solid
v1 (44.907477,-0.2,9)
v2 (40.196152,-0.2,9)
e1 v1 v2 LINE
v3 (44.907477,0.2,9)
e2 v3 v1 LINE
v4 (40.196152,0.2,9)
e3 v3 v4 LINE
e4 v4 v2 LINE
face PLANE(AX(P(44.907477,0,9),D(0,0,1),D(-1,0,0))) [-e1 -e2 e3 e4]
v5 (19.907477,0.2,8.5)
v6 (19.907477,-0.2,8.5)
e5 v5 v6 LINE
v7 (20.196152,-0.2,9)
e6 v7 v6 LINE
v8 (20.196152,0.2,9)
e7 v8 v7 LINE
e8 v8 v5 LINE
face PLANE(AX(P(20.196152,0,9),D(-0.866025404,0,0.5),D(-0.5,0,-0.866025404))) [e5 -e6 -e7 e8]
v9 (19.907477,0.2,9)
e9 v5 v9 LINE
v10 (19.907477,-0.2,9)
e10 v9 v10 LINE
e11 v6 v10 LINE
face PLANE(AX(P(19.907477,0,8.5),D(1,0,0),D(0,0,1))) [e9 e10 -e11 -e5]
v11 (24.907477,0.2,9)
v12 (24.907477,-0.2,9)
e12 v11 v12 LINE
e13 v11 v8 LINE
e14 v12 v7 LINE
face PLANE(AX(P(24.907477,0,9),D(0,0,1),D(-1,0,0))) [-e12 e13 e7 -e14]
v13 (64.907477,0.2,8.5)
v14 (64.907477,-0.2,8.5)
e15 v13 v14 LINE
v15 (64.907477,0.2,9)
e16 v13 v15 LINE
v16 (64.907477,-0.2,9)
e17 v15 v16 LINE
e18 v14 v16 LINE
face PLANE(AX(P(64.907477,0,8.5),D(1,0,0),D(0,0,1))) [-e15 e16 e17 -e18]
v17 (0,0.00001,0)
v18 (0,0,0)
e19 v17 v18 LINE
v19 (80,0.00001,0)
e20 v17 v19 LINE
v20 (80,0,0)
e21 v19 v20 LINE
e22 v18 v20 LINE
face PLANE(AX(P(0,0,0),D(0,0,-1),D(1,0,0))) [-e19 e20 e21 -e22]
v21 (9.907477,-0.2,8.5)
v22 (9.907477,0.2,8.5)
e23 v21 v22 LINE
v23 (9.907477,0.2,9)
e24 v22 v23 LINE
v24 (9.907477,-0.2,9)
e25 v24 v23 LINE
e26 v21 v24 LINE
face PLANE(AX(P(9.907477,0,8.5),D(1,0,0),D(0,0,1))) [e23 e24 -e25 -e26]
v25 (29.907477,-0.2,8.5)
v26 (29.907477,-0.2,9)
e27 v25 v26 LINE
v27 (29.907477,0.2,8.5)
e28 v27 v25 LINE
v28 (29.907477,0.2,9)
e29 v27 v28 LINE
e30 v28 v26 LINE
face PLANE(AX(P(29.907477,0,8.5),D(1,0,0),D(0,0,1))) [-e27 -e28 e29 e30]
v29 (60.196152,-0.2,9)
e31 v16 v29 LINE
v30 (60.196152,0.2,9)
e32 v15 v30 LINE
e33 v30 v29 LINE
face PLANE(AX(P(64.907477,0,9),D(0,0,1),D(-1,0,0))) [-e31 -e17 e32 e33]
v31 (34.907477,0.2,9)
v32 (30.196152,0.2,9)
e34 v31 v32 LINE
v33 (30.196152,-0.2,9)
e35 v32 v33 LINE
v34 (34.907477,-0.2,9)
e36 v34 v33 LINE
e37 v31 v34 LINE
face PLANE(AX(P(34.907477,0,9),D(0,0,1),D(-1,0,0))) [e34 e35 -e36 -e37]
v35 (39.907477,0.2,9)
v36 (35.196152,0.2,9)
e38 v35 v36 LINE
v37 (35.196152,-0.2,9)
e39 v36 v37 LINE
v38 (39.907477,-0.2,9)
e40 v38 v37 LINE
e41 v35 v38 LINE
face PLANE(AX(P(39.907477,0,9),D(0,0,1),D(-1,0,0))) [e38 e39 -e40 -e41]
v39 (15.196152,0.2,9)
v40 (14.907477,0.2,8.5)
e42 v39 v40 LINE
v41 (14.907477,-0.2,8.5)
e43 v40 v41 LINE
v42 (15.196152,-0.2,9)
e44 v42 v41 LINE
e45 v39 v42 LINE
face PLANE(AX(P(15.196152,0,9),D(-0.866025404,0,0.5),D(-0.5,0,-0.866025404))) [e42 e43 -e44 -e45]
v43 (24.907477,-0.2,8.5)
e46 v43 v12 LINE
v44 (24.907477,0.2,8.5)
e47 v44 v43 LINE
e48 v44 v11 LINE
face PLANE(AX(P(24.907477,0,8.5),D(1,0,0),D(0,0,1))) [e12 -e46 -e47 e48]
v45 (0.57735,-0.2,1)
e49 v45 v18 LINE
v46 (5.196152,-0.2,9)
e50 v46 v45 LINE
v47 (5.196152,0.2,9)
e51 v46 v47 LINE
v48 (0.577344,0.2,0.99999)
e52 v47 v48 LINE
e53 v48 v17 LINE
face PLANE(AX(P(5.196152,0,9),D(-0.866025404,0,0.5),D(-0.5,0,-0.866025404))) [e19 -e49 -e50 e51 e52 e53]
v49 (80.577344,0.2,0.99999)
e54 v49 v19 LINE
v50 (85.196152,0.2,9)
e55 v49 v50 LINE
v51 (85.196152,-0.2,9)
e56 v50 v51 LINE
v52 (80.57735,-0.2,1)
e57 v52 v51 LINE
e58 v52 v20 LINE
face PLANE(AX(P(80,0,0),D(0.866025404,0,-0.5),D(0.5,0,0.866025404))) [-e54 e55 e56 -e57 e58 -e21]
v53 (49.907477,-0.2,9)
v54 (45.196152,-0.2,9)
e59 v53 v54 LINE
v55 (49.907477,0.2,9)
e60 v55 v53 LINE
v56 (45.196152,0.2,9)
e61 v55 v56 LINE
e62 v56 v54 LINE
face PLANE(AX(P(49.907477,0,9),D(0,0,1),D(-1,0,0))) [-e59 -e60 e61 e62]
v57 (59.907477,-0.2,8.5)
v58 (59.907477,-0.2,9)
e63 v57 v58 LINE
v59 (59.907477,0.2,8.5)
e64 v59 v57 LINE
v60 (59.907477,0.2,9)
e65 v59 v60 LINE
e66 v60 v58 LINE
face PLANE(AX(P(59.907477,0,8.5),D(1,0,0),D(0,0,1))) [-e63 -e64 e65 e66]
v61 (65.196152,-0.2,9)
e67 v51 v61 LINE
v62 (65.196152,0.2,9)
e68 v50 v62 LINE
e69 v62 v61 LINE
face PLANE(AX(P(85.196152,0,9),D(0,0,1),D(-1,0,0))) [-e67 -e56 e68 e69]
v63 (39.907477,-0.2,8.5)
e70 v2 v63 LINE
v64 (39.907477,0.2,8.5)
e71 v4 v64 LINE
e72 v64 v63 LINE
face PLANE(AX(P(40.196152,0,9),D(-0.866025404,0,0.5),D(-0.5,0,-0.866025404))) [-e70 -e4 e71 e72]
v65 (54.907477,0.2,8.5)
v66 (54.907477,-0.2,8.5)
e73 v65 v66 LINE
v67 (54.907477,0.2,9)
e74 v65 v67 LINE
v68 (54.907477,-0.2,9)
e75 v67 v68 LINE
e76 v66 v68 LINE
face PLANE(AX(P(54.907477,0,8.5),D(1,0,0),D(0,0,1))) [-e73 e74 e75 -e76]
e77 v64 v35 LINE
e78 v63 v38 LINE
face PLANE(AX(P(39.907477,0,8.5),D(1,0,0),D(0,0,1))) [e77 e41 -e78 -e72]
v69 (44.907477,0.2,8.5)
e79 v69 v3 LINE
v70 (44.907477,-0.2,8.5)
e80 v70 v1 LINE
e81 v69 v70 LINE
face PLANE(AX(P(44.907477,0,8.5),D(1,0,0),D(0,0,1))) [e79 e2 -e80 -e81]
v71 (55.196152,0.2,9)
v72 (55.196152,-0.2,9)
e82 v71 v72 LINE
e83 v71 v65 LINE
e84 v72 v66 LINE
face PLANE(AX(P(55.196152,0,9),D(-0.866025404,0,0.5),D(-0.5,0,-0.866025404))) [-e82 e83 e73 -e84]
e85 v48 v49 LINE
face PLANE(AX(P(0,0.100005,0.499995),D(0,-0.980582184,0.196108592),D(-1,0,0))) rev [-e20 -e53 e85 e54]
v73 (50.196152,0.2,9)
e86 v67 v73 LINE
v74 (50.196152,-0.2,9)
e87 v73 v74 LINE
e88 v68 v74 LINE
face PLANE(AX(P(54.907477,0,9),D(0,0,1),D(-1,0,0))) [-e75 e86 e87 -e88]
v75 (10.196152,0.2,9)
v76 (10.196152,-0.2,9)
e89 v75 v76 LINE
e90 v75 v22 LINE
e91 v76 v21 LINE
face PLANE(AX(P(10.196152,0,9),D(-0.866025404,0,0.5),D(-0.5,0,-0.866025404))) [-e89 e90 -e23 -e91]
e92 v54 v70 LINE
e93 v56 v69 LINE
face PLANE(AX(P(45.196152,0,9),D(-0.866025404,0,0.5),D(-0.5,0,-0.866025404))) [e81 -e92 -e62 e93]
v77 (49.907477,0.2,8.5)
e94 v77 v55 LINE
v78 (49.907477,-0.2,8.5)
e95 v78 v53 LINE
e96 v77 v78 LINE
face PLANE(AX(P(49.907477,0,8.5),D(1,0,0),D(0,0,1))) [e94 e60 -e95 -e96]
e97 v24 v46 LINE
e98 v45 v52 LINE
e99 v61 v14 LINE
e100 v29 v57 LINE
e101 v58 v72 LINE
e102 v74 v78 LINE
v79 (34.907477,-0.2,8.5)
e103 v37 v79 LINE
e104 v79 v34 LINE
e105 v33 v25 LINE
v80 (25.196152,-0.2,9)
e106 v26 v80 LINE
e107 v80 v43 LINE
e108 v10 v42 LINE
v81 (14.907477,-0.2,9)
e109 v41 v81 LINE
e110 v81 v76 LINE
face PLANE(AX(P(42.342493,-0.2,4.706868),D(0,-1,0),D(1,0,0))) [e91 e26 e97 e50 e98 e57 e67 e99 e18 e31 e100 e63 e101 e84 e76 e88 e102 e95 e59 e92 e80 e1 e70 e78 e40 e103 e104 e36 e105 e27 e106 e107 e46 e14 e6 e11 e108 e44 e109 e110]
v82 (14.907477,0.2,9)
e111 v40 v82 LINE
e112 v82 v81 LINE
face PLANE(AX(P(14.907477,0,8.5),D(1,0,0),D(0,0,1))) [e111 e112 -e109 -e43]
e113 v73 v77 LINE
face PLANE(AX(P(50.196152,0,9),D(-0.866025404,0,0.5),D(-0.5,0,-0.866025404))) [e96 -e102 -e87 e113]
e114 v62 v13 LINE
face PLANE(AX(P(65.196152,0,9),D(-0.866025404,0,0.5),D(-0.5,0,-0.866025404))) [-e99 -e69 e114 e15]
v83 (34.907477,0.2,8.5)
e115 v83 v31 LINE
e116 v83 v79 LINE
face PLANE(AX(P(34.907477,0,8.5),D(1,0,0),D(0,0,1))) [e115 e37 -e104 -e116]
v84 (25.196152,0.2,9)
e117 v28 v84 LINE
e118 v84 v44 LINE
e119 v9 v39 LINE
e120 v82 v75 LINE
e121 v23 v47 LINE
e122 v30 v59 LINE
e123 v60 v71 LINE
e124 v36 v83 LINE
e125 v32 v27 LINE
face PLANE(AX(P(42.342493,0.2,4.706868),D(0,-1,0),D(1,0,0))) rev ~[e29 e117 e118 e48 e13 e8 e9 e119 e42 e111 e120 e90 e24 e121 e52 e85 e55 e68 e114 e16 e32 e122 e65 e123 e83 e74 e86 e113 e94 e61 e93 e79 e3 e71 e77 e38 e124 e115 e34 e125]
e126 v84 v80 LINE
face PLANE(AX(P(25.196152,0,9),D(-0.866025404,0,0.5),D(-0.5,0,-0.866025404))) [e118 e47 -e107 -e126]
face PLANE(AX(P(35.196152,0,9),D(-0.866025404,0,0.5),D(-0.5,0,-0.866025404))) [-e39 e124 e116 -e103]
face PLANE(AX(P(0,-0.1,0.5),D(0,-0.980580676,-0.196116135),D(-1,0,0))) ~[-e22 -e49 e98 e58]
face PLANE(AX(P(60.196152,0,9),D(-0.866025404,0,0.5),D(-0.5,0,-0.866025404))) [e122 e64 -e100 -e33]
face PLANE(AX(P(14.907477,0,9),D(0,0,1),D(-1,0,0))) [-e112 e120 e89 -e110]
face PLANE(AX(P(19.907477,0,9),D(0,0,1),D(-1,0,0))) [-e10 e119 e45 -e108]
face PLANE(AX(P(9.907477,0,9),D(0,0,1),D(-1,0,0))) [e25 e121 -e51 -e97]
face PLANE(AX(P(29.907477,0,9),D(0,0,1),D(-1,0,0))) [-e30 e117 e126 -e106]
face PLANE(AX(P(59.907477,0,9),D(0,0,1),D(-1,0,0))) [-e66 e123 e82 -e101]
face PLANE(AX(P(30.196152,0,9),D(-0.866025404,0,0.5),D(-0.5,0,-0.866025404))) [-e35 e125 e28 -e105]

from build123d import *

# Parameters (mm, degrees)
F1_DEPTH   = 0.2
F2_SIZE2   = 0.2
F2_SIZE    = 1
F2_2_SIZE2 = 0.19999
F2_2_SIZE  = 0.99999


# Not quite as in the source:
# - a fillet or chamfer is up to 0.001 mm smaller than in the source, because OpenCascade refuses the exact size


with BuildPart() as f1:
    # F0 (on Front) → F1 (new body, symmetric)
    with BuildSketch(Plane.XZ):
        Polygon((5.1961524227, 9), (0, 0), (80, 0), (85.1961524227, 9), (65.1961524227, 9), (64.9074772881, 8.5), (64.9074772881, 9), (60.1961524227, 9), (59.9074772881, 8.5), (59.9074772881, 9), (55.1961524227, 9), (54.9074772881, 8.5), (54.9074772881, 9), (50.1961524227, 9), (49.9074772881, 8.5), (49.9074772881, 9), (45.1961524227, 9), (44.9074772881, 8.5), (44.9074772881, 9), (40.1961524227, 9), (39.9074772881, 8.5), (39.9074772881, 9), (35.1961524227, 9), (34.9074772881, 8.5), (34.9074772881, 9), (30.1961524227, 9), (29.9074772881, 8.5), (29.9074772881, 9), (25.1961524227, 9), (24.9074772881, 8.5), (24.9074772881, 9), (20.1961524227, 9), (19.9074772881, 8.5), (19.9074772881, 9), (15.1961524227, 9), (14.9074772881, 8.5), (14.9074772881, 9), (10.1961524227, 9), (9.9074772881, 8.5), (9.9074772881, 9), align=None)
    extrude(amount=F1_DEPTH, both=True)

    # F2
    f2_edges = [f1.edges().sort_by_distance(p)[0] for p in [
        (40, -0.2, 0),
    ]]
    f2_side = f1.faces().sort_by_distance((42.604211, -0.2, 4.494782))[0]
    chamfer(f2_edges, length=F2_SIZE, length2=F2_SIZE2, reference=f2_side)

    # F2#2 (size 1 and 0.2 in the source; OpenCascade refuses exactly that, so slightly less here)
    f2_2_edges = [f1.edges().sort_by_distance(p)[0] for p in [
        (40, 0.2, 0),
    ]]
    f2_2_side = f1.faces().sort_by_distance((42.604211, 0.2, 4.494782))[0]
    chamfer(f2_2_edges, length=F2_2_SIZE, length2=F2_2_SIZE2, reference=f2_2_side)


solid = f1.part
